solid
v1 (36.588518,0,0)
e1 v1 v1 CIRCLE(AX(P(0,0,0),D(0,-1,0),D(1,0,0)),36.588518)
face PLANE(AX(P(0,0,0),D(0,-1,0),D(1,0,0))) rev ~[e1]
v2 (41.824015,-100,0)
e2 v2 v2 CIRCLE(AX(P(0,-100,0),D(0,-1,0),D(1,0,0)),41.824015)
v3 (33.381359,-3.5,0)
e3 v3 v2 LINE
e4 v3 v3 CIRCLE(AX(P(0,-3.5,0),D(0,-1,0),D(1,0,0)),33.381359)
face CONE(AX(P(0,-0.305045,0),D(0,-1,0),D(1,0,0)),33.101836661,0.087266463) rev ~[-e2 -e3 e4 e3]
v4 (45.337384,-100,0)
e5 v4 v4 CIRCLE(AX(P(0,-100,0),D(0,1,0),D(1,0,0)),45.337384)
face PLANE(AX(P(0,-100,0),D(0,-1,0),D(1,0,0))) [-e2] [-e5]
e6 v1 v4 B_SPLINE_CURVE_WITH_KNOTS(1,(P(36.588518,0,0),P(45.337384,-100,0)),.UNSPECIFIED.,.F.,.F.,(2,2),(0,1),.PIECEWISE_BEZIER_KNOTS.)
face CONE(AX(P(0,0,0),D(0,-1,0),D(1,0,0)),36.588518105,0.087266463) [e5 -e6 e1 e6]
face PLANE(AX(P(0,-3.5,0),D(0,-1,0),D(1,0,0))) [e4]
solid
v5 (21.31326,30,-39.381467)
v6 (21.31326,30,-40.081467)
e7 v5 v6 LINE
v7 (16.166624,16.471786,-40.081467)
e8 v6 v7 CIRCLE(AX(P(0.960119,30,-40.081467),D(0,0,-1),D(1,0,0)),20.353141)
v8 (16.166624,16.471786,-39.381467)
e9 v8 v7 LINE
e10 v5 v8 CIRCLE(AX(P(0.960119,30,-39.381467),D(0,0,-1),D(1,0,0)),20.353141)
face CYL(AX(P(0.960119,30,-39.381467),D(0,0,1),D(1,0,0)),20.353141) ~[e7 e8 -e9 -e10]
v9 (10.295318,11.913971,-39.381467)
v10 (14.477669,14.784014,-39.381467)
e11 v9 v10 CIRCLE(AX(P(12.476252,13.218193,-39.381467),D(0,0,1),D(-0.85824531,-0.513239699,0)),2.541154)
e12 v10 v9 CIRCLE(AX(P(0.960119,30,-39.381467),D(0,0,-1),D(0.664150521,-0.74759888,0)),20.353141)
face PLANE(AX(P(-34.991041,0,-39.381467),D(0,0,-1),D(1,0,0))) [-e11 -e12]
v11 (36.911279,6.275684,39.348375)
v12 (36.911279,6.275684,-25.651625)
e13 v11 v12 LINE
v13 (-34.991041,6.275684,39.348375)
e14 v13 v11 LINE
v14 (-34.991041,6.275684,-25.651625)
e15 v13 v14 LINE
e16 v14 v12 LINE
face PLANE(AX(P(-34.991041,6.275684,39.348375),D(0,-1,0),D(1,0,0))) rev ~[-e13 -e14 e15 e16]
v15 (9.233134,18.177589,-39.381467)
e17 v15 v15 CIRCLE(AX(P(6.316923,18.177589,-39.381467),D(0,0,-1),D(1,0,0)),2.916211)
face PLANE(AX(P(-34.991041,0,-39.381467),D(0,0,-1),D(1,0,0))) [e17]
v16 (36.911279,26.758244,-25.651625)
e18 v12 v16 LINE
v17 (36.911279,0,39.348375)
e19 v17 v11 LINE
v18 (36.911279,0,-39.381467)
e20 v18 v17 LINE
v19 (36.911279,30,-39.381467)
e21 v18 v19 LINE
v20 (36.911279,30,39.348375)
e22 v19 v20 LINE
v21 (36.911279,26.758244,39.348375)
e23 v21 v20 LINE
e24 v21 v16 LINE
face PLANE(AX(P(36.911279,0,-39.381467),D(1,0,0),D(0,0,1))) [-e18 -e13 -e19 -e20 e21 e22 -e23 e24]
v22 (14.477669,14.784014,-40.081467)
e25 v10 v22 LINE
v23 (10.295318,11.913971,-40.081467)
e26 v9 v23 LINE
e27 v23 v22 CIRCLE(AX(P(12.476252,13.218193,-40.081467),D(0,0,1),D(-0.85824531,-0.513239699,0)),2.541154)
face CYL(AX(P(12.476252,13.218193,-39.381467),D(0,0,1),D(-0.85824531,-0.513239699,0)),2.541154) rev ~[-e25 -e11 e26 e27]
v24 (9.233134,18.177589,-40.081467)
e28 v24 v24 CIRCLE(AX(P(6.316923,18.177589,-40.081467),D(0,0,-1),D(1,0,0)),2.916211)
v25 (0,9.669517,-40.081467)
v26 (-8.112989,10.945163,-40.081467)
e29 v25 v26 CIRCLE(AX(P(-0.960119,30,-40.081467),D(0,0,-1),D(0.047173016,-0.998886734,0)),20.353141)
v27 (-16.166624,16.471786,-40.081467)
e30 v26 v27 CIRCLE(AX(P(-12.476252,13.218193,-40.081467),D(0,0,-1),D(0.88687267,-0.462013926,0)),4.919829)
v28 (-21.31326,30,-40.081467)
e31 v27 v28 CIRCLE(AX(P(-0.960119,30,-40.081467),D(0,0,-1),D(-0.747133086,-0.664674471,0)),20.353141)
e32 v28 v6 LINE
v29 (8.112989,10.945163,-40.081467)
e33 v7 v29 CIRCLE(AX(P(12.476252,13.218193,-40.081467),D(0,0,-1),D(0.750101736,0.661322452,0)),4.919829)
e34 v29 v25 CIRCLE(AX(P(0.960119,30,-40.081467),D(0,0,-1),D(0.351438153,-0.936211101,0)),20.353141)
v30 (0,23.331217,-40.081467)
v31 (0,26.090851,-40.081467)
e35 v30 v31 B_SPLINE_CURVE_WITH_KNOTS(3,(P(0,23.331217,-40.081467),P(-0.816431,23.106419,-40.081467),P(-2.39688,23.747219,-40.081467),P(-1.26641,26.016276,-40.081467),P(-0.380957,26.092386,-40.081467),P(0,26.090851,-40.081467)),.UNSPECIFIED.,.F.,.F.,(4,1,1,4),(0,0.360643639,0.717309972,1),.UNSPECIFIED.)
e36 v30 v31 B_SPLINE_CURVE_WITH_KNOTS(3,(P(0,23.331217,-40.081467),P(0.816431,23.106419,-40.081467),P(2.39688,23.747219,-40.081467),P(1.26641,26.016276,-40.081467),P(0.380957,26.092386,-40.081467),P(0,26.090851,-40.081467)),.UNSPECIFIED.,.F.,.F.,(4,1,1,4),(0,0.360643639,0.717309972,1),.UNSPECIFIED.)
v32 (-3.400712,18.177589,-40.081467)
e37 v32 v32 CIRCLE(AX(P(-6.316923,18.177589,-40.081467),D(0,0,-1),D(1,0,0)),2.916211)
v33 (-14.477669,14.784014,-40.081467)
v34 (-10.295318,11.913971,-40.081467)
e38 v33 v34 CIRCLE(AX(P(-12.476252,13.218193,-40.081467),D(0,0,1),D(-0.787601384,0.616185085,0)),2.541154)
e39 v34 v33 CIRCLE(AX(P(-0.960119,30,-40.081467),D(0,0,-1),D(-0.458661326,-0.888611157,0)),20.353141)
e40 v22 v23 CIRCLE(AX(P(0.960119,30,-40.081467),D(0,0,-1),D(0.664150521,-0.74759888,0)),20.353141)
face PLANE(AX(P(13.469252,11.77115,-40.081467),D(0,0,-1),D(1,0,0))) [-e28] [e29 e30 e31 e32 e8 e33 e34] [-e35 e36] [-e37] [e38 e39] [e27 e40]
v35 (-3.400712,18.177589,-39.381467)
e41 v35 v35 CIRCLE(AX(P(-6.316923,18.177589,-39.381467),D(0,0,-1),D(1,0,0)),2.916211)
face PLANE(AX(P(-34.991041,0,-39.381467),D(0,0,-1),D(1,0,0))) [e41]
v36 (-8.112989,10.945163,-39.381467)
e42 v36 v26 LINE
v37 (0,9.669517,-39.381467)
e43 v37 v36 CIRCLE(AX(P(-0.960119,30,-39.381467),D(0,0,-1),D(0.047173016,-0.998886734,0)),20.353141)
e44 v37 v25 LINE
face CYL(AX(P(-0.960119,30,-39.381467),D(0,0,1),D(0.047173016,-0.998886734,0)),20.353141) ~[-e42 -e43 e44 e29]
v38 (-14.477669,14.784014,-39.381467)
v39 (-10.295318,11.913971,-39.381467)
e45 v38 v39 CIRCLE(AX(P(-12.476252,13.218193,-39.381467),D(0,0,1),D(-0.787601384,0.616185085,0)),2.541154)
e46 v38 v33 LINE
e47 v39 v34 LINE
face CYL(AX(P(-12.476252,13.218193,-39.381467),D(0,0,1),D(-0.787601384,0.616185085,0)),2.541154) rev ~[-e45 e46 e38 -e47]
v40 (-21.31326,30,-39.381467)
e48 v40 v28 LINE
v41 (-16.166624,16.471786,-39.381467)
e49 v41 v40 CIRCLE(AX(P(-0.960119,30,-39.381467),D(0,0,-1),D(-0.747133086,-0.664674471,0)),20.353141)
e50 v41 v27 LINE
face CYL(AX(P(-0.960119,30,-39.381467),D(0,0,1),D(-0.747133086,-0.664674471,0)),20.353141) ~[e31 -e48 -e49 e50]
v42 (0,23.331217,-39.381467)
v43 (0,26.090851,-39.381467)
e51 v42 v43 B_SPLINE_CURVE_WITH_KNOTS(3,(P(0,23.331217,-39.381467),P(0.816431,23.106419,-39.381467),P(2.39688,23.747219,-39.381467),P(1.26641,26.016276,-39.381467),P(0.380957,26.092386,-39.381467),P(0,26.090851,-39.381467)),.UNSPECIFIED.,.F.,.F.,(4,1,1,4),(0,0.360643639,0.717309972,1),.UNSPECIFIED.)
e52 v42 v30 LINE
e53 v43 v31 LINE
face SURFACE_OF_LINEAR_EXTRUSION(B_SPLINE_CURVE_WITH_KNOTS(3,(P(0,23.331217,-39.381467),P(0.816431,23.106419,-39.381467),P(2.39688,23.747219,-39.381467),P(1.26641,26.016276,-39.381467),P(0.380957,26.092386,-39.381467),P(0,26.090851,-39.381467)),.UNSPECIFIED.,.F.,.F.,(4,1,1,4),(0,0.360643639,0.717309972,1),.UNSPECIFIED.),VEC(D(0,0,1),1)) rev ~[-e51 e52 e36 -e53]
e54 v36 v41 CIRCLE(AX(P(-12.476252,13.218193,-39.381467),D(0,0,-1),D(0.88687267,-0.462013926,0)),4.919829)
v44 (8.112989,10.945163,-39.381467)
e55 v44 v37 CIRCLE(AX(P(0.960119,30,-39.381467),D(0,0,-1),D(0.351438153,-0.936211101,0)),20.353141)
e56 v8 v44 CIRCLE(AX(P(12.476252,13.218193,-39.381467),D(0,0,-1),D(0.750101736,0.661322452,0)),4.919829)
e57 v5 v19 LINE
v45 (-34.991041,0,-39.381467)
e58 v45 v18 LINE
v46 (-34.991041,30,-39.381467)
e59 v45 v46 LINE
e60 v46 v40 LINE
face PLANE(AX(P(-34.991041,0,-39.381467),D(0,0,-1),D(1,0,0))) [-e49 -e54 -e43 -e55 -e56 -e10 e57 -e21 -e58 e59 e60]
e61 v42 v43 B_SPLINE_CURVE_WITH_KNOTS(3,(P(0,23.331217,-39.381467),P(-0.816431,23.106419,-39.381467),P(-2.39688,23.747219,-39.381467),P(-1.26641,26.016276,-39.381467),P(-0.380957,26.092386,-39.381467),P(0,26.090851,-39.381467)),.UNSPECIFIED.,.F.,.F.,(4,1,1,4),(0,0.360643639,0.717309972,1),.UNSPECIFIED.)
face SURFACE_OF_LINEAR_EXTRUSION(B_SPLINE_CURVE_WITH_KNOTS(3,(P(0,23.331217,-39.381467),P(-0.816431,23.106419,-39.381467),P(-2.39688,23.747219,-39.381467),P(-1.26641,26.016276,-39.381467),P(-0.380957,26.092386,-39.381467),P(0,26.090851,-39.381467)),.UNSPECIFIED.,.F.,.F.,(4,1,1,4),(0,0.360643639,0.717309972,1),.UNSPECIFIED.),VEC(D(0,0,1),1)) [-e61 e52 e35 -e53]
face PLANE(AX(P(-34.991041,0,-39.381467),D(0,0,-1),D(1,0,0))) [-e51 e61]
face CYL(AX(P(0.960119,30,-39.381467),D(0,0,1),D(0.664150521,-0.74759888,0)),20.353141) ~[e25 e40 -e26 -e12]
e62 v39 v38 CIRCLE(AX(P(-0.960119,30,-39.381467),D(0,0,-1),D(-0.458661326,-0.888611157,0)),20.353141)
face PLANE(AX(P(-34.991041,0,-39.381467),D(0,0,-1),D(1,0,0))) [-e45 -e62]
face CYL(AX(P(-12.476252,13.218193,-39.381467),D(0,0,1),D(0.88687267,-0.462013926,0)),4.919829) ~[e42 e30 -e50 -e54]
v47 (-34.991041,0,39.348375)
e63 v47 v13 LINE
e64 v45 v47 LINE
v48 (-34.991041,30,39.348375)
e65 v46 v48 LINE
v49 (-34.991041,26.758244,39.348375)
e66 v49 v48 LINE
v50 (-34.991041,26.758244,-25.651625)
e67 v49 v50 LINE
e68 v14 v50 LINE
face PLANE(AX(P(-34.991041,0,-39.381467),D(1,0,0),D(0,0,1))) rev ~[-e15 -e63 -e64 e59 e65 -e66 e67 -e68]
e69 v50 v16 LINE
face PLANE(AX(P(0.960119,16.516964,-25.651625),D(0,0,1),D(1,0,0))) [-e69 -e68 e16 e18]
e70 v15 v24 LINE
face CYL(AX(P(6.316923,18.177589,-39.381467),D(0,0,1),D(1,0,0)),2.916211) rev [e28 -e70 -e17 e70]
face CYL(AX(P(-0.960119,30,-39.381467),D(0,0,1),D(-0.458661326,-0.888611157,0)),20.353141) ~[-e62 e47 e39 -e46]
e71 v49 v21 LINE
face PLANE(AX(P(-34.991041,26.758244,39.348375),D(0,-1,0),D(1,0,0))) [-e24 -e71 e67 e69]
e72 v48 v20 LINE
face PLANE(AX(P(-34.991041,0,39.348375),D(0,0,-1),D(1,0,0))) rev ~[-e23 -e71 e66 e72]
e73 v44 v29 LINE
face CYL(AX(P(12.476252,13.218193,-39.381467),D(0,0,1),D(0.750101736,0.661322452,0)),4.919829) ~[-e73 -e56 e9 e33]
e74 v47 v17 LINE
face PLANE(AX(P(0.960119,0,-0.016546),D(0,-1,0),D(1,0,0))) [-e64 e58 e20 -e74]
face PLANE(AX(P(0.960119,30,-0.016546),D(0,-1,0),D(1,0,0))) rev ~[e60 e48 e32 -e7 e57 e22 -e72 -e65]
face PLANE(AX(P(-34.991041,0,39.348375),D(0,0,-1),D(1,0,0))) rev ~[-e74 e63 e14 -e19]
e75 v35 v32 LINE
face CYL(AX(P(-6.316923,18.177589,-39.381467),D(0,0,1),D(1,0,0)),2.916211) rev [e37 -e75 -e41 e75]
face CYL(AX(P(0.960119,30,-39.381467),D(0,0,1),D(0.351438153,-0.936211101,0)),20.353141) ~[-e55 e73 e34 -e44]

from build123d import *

# Parameters (mm, degrees)
F0_W     = 71.9023197889
F0_H     = 78.7298418581
F1_DEPTH = 30
F2_R     = 36.5885181047
F3_DEPTH = 100
F3_TAPER = -5
F4_T     = -3.5
F5_W     = 71.9023197889
F5_H     = 20.4825603869
F6_DEPTH = 65
F7_R     = 2.9162112623
F8_DEPTH = 0.7


# Not quite as in the source:
# - a feature names something its author has since deleted; it is built from what else it names


with BuildPart() as f1:
    # F0 (on Front) → F1 (new body)
    with BuildSketch(Plane.XZ):
        with Locations((0.9601190686, -0.0165458769)):
            Rectangle(F0_W, F0_H)
    extrude(amount=-F1_DEPTH)

    # F5 (on face) → F6 (cut)
    with BuildSketch(Plane.XY.offset(39.3483750522)):
        with Locations((0.9601190686, 16.5169640677)):
            Rectangle(F5_W, F5_H)
    extrude(amount=-F6_DEPTH, mode=Mode.SUBTRACT)

    # F7 (on face) → F8 (join)
    with BuildSketch(Plane(origin=(0, 0, -39.3814668059), x_dir=(1, 0, 0), z_dir=(0, 0, -1))):
        with BuildLine():
            ThreePointArc((14.4776685496, -14.7840142781), (15.3469177119, -15.6031117856), (16.1666244153, -16.4717864964))
            ThreePointArc((16.1666244153, -16.4717864964), (15.2599699365, -9.1616381984), (8.1129894908, -10.9451630765))
            ThreePointArc((8.1129894908, -10.9451630765), (9.2183727795, -11.3975374989), (10.2953179003, -11.9139714633))
            ThreePointArc((10.2953179003, -11.9139714633), (13.9140775904, -11.1229307961), (14.4776685496, -14.7840142781))
        make_face()
        with BuildLine():
            Line((-21.3132604836, -30), (21.3132604836, -30))
            ThreePointArc((21.3132604836, -30), (19.9831382718, -22.7629352736), (16.1666244153, -16.4717864964))
            ThreePointArc((16.1666244153, -16.4717864964), (15.3469177119, -15.6031117856), (14.4776685496, -14.7840142781))
            ThreePointArc((14.4776685496, -14.7840142781), (12.4762517876, -13.2181928071), (10.2953179003, -11.9139714633))
            ThreePointArc((10.2953179003, -11.9139714633), (9.2183727795, -11.3975374989), (8.1129894908, -10.9451630765))
            ThreePointArc((8.1129894908, -10.9451630765), (4.1215049239, -9.8938814056), (0, -9.6695170536))
            ThreePointArc((0, -9.6695170536), (-4.1215049239, -9.8938814056), (-8.1129894908, -10.9451630765))
            ThreePointArc((-8.1129894908, -10.9451630765), (-9.2183727795, -11.3975374989), (-10.2953179003, -11.9139714633))
            ThreePointArc((-10.2953179003, -11.9139714633), (-12.4762517876, -13.2181928071), (-14.4776685496, -14.7840142781))
            ThreePointArc((-14.4776685496, -14.7840142781), (-15.3469177119, -15.6031117856), (-16.1666244153, -16.4717864964))
            ThreePointArc((-16.1666244153, -16.4717864964), (-19.9831382718, -22.7629352736), (-21.3132604836, -30))
        make_face()
        with BuildLine():
            add(Edge.make_bspline(
                [(0, -23.3312174678), (-0.816430616, -23.1064193373), (-2.3968803534, -23.7472193633), (-1.266410215, -26.0162755449), (-0.3809565691, -26.0923855136), (0, -26.0908510536)],
                knots=[0, 0, 0, 0, 0.3606436386, 0.7173099723, 1, 1, 1, 1], degree=3))
            add(Edge.make_bspline(
                [(0, -23.3312174678), (0.816430616, -23.1064193373), (2.3968803534, -23.7472193633), (1.266410215, -26.0162755449), (0.3809565691, -26.0923855136), (0, -26.0908510536)],
                knots=[0, 0, 0, 0, 0.3606436386, 0.7173099723, 1, 1, 1, 1], degree=3))
        make_face(mode=Mode.SUBTRACT)
        with Locations((-6.3169230707, -18.1775894016)):
            Circle(F7_R, mode=Mode.SUBTRACT)
        with Locations((6.3169230707, -18.1775894016)):
            Circle(F7_R, mode=Mode.SUBTRACT)
        with BuildLine():
            ThreePointArc((-8.1129894908, -10.9451630765), (-15.2599699365, -9.1616381984), (-16.1666244153, -16.4717864964))
            ThreePointArc((-16.1666244153, -16.4717864964), (-15.3469177119, -15.6031117856), (-14.4776685496, -14.7840142781))
            ThreePointArc((-14.4776685496, -14.7840142781), (-13.9140775904, -11.1229307961), (-10.2953179003, -11.9139714633))
            ThreePointArc((-10.2953179003, -11.9139714633), (-9.2183727795, -11.3975374989), (-8.1129894908, -10.9451630765))
        make_face()
    extrude(amount=F8_DEPTH)


with BuildPart() as f3:
    # F2 (on Front) → F3 (new body)
    with BuildSketch(Plane.XZ):
        Circle(F2_R)
    extrude(amount=F3_DEPTH, taper=F3_TAPER)

    # F4
    f4_openings = [f3.faces().sort_by_distance(p)[0] for p in [
        (0, -100, 0),
    ]]
    offset(amount=F4_T, openings=f4_openings, kind=Kind.INTERSECTION)


solid = Compound([f1.part, f3.part])
